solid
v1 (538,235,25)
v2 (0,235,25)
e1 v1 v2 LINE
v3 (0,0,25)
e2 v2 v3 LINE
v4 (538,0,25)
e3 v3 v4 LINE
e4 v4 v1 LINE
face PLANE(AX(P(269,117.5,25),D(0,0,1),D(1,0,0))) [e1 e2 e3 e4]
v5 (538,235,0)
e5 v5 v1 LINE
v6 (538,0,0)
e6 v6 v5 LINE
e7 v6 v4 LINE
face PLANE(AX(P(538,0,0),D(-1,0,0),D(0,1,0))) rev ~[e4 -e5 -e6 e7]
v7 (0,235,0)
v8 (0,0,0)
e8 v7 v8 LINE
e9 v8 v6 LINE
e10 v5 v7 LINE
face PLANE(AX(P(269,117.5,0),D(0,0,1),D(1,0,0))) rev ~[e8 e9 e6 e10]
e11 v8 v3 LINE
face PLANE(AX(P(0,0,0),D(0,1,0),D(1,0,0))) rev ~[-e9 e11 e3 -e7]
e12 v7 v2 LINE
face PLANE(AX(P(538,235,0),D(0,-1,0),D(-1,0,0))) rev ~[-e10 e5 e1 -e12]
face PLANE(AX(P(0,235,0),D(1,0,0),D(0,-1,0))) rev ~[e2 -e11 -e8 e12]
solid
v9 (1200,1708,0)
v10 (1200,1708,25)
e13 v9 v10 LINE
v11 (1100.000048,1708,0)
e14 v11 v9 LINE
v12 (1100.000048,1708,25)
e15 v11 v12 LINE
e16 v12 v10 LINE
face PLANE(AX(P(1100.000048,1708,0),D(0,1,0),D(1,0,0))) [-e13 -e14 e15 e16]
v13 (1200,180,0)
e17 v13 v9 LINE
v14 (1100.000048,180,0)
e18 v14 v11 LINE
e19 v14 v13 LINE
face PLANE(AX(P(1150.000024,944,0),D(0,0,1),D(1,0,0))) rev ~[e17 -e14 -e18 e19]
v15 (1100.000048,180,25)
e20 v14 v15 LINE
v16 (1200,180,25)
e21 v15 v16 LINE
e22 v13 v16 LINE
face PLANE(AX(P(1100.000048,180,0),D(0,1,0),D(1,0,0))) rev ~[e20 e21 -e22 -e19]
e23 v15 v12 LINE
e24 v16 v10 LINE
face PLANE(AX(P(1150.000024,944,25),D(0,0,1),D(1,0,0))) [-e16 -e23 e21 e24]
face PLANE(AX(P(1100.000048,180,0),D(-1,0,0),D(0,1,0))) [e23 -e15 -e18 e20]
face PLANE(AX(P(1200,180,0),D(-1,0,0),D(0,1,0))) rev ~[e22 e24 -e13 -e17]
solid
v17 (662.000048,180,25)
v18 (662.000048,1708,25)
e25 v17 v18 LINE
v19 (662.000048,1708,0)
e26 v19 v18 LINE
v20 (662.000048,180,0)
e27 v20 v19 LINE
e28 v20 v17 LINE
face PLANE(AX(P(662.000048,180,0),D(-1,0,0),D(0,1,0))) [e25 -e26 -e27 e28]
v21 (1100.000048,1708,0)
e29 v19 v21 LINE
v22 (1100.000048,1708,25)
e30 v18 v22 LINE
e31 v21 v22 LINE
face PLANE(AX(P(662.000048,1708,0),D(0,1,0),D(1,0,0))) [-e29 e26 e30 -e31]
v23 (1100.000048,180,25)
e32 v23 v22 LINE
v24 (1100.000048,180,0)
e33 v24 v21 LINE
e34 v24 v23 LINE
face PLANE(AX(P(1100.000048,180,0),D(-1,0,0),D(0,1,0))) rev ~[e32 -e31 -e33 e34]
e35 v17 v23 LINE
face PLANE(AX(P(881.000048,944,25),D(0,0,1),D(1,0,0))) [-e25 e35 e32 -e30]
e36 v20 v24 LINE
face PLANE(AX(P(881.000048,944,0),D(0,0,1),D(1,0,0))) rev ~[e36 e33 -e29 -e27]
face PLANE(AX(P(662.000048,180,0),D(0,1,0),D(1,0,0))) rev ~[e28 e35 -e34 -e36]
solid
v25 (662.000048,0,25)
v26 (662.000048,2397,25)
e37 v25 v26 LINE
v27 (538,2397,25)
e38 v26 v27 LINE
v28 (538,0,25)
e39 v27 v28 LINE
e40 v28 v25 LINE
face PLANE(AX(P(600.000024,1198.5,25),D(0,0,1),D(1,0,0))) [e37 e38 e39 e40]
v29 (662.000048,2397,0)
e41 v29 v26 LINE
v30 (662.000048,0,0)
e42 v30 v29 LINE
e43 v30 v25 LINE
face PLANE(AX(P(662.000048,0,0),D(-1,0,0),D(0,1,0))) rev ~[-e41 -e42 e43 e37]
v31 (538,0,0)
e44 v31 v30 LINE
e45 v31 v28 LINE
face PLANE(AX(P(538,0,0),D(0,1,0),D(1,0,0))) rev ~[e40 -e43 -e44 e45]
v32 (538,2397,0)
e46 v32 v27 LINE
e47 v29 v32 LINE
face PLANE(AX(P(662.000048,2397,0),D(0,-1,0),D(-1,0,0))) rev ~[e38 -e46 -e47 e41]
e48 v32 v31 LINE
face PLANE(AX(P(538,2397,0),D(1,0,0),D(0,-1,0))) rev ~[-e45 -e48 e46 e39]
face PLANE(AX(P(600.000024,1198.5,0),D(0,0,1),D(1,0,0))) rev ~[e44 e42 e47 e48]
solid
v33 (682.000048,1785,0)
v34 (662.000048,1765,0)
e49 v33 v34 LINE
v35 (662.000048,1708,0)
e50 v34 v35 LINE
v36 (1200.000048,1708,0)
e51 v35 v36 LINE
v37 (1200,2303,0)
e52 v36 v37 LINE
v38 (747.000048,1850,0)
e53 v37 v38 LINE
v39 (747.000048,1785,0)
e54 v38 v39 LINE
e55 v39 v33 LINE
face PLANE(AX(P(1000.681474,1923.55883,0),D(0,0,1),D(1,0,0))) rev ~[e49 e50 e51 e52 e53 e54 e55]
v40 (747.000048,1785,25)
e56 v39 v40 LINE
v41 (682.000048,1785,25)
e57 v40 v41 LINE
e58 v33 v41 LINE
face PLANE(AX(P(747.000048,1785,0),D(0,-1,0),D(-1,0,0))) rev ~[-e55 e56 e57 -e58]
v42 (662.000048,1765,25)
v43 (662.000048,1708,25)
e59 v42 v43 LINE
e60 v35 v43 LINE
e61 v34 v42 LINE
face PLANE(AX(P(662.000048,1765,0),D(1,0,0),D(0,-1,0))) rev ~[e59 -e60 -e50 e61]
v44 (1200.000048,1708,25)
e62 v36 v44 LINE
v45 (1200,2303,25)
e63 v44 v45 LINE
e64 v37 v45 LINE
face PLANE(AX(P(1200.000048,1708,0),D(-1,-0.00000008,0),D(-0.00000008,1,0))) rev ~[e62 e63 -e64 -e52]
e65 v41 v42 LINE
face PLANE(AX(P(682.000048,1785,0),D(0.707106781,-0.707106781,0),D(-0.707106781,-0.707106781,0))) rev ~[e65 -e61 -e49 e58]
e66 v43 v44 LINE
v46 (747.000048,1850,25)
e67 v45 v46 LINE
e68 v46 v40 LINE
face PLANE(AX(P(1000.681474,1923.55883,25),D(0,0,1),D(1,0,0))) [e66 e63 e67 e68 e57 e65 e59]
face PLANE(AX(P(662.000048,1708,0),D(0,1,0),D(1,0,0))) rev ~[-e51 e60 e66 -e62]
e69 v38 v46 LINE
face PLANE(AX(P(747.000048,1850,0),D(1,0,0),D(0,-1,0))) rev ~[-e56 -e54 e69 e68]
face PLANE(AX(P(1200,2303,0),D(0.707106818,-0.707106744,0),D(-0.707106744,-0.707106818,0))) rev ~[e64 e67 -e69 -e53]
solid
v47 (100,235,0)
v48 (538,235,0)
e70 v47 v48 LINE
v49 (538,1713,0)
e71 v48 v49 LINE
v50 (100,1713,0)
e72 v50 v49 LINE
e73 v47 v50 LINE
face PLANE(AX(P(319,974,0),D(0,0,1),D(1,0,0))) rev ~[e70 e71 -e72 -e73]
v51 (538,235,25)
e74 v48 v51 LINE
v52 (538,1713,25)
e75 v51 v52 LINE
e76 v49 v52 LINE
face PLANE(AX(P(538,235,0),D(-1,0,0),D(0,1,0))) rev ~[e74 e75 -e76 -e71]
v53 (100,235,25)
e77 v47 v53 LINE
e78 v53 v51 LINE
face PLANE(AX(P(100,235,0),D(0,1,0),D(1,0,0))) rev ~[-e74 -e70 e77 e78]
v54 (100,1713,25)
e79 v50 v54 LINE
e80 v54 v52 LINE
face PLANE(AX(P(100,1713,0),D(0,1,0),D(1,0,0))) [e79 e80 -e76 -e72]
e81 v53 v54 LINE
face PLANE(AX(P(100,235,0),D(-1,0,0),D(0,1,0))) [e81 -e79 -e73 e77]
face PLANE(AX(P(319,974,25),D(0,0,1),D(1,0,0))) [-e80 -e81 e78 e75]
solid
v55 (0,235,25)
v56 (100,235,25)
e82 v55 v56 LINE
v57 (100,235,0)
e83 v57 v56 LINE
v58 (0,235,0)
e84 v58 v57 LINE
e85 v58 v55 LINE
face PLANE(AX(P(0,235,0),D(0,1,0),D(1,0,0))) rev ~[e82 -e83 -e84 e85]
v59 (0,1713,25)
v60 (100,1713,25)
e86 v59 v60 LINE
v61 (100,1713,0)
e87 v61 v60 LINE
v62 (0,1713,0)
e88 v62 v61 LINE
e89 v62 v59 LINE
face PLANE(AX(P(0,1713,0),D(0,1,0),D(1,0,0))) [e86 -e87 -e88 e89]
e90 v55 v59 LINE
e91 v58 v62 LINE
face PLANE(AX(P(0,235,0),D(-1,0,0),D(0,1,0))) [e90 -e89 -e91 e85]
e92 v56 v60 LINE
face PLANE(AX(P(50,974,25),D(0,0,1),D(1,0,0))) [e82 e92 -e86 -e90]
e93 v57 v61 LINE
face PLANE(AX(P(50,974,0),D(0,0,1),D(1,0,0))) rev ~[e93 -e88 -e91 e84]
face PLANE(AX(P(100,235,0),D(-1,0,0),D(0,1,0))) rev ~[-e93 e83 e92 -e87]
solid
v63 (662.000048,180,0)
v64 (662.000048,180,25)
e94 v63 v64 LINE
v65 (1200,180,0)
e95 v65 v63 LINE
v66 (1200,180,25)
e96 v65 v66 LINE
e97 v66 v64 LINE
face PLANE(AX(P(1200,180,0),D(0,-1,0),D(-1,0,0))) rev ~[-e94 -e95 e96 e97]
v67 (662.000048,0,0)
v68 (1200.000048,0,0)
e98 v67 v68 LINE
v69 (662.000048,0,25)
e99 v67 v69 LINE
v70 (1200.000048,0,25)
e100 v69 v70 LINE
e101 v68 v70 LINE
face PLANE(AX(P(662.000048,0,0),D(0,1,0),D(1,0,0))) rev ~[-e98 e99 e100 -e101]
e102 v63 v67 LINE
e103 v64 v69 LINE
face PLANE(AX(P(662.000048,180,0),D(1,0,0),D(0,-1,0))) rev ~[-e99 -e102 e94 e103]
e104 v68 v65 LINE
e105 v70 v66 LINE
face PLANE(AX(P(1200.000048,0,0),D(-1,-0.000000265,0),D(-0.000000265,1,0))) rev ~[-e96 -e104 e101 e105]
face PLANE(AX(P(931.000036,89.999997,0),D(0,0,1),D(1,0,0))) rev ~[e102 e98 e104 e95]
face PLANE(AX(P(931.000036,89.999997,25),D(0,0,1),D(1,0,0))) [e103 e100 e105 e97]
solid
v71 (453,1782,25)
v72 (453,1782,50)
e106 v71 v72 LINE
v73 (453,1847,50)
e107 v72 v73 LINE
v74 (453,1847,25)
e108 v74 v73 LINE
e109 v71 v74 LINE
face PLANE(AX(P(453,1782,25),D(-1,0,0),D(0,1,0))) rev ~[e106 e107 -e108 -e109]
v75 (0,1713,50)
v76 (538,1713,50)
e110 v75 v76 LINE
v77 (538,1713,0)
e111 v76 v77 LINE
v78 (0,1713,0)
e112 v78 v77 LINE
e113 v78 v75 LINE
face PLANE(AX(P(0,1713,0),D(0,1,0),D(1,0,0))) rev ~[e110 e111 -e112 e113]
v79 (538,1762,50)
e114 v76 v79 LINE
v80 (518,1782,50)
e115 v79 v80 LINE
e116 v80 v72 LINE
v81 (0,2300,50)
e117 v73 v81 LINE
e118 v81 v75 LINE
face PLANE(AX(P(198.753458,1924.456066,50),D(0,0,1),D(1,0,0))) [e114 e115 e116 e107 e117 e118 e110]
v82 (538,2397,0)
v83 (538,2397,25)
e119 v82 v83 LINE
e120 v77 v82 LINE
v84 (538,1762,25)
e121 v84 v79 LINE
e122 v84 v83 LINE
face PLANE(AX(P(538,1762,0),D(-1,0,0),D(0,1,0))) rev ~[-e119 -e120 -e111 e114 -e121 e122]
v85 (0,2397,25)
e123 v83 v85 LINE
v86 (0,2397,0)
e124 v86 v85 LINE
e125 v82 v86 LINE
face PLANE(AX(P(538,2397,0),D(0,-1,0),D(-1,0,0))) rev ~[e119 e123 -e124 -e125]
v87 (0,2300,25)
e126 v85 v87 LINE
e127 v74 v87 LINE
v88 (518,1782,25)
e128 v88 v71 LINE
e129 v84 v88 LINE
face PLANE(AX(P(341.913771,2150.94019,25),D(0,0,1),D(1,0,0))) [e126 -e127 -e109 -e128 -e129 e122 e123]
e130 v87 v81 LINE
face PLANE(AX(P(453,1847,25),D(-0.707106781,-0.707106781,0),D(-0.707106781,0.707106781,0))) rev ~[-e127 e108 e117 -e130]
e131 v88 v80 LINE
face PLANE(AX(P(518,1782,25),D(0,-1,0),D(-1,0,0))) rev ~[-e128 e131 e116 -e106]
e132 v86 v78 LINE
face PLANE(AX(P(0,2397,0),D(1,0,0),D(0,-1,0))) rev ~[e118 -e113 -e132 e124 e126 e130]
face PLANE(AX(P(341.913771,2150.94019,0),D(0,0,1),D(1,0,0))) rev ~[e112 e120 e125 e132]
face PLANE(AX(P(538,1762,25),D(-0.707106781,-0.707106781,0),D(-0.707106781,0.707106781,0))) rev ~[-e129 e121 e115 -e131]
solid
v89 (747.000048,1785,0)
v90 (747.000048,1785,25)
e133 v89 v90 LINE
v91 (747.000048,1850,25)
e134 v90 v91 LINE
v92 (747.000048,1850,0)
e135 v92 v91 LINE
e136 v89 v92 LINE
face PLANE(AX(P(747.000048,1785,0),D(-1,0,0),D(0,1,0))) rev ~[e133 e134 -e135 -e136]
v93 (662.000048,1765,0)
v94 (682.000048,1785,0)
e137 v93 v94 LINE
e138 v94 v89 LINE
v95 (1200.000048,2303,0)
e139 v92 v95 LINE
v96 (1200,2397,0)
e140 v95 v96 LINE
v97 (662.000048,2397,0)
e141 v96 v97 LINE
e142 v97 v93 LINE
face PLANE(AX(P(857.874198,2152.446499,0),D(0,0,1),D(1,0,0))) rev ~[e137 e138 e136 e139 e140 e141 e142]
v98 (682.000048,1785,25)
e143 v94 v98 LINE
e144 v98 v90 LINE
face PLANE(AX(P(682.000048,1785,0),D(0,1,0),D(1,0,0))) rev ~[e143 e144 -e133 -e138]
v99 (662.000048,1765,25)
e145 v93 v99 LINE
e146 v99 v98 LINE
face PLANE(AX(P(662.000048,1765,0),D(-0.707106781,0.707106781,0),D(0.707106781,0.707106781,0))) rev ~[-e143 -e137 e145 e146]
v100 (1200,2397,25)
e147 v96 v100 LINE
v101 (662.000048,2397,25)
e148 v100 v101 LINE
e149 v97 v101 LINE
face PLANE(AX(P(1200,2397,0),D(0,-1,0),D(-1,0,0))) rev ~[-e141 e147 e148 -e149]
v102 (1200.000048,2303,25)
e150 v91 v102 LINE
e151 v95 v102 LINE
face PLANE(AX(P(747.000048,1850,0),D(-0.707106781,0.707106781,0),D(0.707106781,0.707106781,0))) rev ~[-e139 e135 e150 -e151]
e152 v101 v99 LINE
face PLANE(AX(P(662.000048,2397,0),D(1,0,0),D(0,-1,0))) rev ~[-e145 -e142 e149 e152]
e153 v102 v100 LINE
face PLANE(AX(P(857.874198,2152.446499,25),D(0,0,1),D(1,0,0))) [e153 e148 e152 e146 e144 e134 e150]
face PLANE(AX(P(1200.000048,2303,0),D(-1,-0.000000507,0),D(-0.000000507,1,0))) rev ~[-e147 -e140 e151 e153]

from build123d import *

# Parameters (mm, degrees)
F0_W     = 438
F0_H     = 1478
F1_DEPTH = 25
F0_H_2   = 1528
F2_DEPTH = 25
F0_W_2   = 100
F3_DEPTH = 25
F0_W_3   = 99.9999523163
F4_DEPTH = 25
F5_DEPTH = 25


# Not quite as in the source:
# - ends of sketch curves that miss each other by under 0.0002 mm in the source are joined


with BuildPart() as f1:
    # F0 (on Top) → F1 (new body)
    with BuildSketch(Plane.XY):
        with Locations((319, 974)):
            Rectangle(F0_W, F0_H)
    extrude(amount=F1_DEPTH)


with BuildPart() as f1b:
    # F0 (on Top) → F1, piece 2 (new body)
    with BuildSketch(Plane.XY):
        with Locations((881.0000476837, 944)):
            Rectangle(F0_W, F0_H_2)
    extrude(amount=F1_DEPTH)


with BuildPart() as f2:
    # F0 (on Top) → F2 (new body)
    with BuildSketch(Plane.XY):
        Polygon((682.0000476837, 1785), (662.0000476837, 1765), (662.0000476837, 1708), (1100.0000476837, 1708), (1200.0000476837, 1708), (1200, 2303), (747.0000476837, 1850), (747.0000476837, 1785), align=None)
    extrude(amount=F2_DEPTH)


with BuildPart() as f2b:
    # F0 (on Top) → F2, piece 2 (new body)
    with BuildSketch(Plane.XY):
        Polygon((1100.0000476837, 180), (662.0000476837, 180), (662.0000476837, 0), (1200.0000476837, 0), (1200, 180), align=None)
    extrude(amount=F2_DEPTH)


with BuildPart() as f2c:
    # F0 (on Top) → F2, piece 3 (new body)
    with BuildSketch(Plane.XY):
        Polygon((100, 235), (0, 235), (0, 0), (538, 0), (538, 235), align=None)
    extrude(amount=F2_DEPTH)


with BuildPart() as f2d:
    # F0 (on Top) → F2, piece 4 (new body)
    with BuildSketch(Plane.XY):
        Polygon((453, 1847), (0, 2300), (0, 1713), (100, 1713), (538, 1713), (538, 1762), (518, 1782), (453, 1782), align=None)
    extrude(amount=F2_DEPTH)

    # F0 (on Top) + F2_face (on face) → F4 (join)
    with BuildSketch(Plane.XY):
        Polygon((1200, 2397), (662.0000476837, 2397), (662.0000476837, 1765), (682.0000476837, 1785), (747.0000476837, 1785), (747.0000476837, 1850), (1200.0000476837, 2303), align=None)
        Polygon((538, 2397), (0, 2397), (0, 2300), (453, 1847), (453, 1782), (518, 1782), (538, 1762), align=None)
    with BuildSketch(Plane(origin=(189.6303420005, 1911.2535062619, 25), x_dir=(1, 0, 0), z_dir=(0, 0, 1))):
        Polygon((263.3696579995, -64.2535062619), (-189.6303420005, 388.7464937381), (-189.6303420005, -198.2535062619), (348.3696579995, -198.2535062619), (348.3696579995, -149.2535062619), (328.3696579995, -129.2535062619), (263.3696579995, -129.2535062619), align=None)
    extrude(amount=F4_DEPTH)


with BuildPart() as f3:
    # F0 (on Top) → F3 (new body)
    with BuildSketch(Plane.XY):
        with Locations((50, 974)):
            Rectangle(F0_W_2, F0_H)
    extrude(amount=F3_DEPTH)


with BuildPart() as f3b:
    # F0 (on Top) → F3, piece 2 (new body)
    with BuildSketch(Plane.XY):
        with Locations((1150.0000238419, 944)):
            Rectangle(F0_W_3, F0_H_2)
    extrude(amount=F3_DEPTH)


with BuildPart() as f5:
    # F0 (on Top) → F5 (new body)
    with BuildSketch(Plane.XY):
        Polygon((662.0000476837, 2397), (538, 2397), (538, 1762), (538, 1713), (538, 235), (538, 0), (662.0000476837, 0), (662.0000476837, 180), (662.0000476837, 1708), (662.0000476837, 1765), align=None)
    extrude(amount=F5_DEPTH)


solid = Compound([f1.part, f1b.part, f2.part, f2b.part, f2c.part, f2d.part, f3.part, f3b.part, f5.part])
